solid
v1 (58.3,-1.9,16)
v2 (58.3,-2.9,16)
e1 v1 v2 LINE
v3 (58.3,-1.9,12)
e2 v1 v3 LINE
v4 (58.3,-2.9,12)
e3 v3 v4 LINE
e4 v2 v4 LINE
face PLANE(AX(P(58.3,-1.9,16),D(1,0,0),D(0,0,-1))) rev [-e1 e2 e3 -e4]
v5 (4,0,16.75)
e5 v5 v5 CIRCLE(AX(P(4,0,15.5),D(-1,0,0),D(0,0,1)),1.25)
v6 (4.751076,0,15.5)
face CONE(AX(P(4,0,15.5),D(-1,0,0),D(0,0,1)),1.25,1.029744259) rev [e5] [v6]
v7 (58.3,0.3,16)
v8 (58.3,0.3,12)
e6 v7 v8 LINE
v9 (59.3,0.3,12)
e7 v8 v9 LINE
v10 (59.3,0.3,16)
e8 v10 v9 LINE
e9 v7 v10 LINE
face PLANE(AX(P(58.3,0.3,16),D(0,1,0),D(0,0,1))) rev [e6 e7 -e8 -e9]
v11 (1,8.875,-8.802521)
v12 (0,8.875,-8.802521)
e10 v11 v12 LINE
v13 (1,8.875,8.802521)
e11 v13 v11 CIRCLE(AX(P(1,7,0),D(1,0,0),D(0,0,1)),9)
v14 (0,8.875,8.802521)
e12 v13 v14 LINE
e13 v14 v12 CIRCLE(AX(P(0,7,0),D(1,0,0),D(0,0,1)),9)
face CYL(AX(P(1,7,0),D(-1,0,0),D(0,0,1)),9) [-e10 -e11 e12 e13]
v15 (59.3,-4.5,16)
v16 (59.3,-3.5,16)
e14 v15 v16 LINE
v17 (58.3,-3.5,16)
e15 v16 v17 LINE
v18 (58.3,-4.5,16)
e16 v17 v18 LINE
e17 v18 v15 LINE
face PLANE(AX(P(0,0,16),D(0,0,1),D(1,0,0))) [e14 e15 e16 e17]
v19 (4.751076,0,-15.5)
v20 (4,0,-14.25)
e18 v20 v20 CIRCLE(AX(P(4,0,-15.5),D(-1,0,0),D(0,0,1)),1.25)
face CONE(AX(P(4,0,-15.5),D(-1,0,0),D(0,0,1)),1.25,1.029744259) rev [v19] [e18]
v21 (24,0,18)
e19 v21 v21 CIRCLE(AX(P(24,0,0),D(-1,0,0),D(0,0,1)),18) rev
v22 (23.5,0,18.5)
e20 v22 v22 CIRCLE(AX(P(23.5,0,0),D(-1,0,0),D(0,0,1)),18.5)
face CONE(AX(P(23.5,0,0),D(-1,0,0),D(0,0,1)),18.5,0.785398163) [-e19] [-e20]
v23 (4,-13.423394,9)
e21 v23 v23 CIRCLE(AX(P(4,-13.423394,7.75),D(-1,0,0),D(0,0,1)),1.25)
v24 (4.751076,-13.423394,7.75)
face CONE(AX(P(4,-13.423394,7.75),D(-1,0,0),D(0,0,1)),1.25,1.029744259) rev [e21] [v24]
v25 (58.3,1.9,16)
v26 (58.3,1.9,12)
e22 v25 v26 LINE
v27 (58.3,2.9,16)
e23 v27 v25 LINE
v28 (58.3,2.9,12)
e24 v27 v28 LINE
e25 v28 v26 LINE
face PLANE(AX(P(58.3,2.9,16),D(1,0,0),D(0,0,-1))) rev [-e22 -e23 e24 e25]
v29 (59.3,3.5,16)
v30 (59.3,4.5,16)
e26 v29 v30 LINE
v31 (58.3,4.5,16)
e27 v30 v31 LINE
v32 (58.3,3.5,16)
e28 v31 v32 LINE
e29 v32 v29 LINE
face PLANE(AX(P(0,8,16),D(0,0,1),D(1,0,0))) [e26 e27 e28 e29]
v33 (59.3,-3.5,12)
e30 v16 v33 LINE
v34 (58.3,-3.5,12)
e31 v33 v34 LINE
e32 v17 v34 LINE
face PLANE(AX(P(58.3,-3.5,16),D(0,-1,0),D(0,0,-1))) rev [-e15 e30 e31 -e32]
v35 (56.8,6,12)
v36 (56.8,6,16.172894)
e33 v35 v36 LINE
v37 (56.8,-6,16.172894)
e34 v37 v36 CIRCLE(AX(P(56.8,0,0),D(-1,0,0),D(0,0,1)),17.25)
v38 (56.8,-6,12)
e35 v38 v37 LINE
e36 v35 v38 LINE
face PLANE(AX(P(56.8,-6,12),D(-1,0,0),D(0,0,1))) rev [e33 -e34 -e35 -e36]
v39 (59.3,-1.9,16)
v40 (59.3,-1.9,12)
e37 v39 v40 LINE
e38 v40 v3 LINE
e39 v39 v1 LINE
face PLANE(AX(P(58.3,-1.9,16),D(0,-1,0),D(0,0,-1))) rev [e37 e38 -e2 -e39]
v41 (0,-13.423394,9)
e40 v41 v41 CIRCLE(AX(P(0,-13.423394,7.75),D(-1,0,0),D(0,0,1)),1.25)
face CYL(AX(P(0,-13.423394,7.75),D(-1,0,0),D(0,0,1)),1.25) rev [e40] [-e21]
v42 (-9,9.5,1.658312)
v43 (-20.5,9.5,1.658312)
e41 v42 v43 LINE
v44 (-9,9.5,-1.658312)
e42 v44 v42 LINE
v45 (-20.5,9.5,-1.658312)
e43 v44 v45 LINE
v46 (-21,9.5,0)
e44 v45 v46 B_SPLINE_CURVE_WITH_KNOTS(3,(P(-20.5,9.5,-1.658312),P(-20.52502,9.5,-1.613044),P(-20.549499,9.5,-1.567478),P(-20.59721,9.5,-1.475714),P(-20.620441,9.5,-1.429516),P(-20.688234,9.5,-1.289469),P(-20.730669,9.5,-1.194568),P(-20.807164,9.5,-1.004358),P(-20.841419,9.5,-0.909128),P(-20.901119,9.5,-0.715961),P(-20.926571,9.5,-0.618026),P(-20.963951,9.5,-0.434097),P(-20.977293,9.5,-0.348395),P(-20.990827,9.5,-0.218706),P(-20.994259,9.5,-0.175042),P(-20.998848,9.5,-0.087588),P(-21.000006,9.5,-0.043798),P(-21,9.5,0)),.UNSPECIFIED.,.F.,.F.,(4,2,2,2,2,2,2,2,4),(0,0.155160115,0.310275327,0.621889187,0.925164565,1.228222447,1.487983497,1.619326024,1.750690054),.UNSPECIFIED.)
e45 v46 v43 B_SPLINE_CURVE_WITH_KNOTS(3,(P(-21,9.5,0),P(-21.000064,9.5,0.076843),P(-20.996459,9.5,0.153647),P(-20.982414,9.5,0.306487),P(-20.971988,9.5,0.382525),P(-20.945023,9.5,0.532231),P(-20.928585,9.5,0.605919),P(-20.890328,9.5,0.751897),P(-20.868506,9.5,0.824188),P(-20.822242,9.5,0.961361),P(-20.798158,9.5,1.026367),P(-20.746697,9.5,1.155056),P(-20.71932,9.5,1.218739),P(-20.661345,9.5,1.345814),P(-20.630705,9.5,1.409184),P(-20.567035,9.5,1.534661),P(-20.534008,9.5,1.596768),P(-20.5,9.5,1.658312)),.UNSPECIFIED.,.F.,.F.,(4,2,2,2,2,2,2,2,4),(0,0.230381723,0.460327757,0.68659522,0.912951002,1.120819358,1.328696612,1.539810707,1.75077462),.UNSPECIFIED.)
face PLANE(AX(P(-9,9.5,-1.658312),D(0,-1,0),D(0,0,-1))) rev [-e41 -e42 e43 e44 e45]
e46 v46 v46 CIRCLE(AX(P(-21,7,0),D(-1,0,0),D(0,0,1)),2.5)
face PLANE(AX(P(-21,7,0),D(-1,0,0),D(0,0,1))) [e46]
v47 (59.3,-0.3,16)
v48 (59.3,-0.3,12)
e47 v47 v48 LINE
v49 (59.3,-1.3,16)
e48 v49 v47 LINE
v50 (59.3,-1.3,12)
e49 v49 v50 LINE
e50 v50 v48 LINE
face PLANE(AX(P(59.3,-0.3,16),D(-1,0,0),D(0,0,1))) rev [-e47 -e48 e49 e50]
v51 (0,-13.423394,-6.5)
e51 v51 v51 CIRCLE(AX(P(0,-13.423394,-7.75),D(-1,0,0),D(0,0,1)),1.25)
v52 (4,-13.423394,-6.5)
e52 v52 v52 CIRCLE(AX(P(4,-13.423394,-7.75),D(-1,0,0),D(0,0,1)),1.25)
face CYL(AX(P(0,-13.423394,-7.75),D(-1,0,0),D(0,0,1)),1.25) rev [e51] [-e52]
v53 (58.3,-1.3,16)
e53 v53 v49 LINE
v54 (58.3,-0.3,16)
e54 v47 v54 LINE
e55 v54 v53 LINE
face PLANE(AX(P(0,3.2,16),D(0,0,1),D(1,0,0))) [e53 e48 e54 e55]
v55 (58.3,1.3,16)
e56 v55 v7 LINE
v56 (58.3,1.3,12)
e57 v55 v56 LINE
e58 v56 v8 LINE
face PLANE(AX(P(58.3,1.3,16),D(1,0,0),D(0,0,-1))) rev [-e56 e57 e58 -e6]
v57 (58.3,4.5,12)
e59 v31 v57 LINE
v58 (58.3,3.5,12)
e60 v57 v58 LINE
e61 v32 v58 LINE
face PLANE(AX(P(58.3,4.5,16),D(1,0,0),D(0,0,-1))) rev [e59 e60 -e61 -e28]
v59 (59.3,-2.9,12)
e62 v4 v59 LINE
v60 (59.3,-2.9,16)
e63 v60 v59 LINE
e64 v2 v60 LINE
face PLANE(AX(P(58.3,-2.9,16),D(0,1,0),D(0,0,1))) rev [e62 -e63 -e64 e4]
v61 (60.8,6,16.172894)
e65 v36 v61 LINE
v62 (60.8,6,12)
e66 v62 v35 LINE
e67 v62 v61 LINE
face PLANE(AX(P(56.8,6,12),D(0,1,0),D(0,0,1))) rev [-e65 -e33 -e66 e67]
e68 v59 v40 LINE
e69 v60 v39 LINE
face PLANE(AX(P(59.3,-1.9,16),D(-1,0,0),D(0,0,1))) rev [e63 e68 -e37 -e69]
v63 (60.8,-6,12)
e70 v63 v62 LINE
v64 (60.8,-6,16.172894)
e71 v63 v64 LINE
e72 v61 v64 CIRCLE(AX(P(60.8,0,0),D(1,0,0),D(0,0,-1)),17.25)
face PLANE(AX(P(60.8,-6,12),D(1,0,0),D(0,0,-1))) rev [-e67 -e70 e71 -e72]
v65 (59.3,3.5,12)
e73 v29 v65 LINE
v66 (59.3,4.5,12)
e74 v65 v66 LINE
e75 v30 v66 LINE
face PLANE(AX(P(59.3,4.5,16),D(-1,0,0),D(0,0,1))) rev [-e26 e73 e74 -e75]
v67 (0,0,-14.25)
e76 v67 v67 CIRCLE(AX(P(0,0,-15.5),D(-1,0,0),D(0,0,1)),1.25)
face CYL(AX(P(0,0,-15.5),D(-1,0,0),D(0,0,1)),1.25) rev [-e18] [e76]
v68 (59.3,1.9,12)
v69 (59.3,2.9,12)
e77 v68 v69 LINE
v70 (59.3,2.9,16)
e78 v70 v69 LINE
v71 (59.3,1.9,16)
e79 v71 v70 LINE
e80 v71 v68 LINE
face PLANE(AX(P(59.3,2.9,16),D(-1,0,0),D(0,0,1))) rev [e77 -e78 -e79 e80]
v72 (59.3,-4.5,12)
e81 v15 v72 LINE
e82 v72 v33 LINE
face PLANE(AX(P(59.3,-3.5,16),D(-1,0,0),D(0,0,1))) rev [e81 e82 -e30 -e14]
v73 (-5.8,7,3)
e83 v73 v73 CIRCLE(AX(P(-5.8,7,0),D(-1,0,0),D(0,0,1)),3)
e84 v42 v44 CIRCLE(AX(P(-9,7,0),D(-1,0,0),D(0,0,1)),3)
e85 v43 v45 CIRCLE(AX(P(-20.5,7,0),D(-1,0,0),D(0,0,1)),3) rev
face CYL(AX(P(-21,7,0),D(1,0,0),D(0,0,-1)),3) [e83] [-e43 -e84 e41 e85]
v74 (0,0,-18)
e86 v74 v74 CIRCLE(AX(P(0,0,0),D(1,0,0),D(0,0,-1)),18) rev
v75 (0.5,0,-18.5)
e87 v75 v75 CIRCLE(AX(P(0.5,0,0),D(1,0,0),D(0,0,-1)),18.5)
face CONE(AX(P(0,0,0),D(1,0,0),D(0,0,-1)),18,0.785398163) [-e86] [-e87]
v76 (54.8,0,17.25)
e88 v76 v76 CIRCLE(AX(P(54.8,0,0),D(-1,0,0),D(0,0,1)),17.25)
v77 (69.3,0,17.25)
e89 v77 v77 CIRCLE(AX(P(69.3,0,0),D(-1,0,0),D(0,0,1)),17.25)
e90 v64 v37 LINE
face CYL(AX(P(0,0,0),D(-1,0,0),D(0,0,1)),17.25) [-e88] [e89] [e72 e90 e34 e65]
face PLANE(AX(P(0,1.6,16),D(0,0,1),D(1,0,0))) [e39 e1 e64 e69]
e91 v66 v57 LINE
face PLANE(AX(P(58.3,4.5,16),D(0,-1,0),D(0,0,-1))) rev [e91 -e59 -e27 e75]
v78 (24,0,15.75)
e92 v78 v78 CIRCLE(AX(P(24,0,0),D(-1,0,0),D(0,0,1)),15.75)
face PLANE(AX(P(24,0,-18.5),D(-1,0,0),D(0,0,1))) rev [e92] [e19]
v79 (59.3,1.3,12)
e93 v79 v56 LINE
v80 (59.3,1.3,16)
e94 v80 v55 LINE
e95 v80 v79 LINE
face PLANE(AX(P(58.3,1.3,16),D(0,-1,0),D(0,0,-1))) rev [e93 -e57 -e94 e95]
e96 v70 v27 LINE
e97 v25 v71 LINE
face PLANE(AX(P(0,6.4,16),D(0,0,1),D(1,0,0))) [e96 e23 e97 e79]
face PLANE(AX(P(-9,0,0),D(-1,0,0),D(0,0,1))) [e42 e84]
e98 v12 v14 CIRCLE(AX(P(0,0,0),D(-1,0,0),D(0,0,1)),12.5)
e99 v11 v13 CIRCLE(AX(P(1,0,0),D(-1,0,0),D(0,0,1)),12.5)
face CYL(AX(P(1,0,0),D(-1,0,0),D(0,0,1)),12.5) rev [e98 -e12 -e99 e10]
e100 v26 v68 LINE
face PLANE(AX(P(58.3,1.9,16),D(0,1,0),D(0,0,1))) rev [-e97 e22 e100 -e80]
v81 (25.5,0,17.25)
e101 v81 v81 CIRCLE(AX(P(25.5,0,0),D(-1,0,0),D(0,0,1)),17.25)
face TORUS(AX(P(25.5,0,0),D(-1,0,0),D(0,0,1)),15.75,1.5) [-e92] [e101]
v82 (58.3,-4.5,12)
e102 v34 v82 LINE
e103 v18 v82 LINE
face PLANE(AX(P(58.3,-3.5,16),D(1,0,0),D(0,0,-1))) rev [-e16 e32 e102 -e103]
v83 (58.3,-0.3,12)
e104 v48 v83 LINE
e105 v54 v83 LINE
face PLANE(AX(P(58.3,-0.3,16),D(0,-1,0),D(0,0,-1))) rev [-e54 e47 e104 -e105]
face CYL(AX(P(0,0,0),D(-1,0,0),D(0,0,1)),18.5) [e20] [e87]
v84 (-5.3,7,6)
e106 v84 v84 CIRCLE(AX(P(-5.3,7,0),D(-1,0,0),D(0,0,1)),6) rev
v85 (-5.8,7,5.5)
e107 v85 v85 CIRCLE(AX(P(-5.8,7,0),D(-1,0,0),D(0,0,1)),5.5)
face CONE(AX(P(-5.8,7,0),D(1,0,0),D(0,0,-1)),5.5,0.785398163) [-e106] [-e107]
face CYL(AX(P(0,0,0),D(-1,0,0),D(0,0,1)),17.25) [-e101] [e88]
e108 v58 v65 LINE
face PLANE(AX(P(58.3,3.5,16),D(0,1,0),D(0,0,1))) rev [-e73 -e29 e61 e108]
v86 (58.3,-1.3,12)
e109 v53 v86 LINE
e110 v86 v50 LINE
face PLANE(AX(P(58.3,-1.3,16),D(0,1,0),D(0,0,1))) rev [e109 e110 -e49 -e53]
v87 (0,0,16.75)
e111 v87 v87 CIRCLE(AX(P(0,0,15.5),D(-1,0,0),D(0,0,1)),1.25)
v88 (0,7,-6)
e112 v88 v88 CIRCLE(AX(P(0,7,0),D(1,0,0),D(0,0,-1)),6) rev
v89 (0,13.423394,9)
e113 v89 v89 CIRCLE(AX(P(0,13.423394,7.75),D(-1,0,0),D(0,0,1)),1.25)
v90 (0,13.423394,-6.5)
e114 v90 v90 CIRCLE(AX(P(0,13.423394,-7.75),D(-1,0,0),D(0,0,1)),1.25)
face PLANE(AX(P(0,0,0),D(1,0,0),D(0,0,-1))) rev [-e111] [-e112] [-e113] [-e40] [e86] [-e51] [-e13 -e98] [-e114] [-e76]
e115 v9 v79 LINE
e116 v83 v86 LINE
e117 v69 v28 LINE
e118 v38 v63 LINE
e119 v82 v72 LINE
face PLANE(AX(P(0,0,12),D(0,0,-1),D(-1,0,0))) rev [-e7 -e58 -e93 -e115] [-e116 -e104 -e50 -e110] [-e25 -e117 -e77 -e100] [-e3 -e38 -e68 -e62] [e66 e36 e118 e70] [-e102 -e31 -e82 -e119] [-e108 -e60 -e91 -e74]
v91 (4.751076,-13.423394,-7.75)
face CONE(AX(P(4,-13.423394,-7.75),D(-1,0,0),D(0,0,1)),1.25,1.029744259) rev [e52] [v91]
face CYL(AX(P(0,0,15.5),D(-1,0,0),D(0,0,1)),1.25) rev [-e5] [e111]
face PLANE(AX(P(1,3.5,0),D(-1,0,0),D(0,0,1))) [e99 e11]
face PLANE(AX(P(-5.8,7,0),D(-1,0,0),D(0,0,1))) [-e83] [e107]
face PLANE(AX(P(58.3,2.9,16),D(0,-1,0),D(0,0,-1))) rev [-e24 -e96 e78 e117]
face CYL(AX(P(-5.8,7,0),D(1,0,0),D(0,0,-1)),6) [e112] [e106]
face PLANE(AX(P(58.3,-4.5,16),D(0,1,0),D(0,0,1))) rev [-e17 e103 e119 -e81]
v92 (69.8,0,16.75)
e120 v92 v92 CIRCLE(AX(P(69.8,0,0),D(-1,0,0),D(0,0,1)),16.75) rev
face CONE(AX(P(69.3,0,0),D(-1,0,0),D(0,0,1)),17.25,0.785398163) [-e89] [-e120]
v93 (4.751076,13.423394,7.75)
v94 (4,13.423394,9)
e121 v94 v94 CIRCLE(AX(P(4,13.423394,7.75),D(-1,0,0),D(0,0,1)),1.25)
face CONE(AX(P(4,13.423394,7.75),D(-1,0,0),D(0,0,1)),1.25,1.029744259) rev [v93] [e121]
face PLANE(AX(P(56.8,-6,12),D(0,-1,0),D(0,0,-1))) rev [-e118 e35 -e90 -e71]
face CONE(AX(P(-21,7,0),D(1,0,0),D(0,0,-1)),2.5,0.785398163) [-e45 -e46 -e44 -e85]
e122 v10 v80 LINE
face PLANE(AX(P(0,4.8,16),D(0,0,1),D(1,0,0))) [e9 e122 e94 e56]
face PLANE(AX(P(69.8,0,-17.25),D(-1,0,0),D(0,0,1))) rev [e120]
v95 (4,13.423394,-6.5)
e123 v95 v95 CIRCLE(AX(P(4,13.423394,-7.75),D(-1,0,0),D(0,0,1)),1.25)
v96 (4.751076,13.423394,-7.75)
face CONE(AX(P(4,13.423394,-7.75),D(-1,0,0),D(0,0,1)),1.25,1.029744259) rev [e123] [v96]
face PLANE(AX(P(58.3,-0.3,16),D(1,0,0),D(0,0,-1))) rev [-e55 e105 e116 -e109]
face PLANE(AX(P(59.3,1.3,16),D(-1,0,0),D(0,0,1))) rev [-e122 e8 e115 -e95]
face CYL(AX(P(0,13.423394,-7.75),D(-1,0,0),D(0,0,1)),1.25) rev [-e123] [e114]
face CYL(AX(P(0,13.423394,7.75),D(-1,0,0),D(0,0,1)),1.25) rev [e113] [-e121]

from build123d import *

# Parameters (mm, degrees)
SKETCH3_R                  = 6
BOSS_EXTRUDE1_DEPTH        = 5.8
SKETCH4_R                  = 3
BOSS_EXTRUDE2_DEPTH        = 15.2
SKETCH5_W                  = 3.31662479
SKETCH5_H                  = 2.173071946
CUT_EXTRUDE1_DEPTH         = 12
CHAMFER1_SIZE              = 0.5
CUT_EXTRUDE2_DEPTH         = 1
M3_TAPPED_HOLE1_AT_2_COUNT = 2
M3_TAPPED_HOLE1_AT_2_PITCH = 26.846787517
M3_TAPPED_HOLE1_AT_3_COUNT = 2
M3_TAPPED_HOLE1_AT_3_PITCH = 26.846787517
CIRPATTERN1_COUNT          = 2
SKETCH10_W                 = 4
SKETCH10_H                 = 12
CUT_EXTRUDE3_DEPTH         = 28
SKETCH11_W                 = 1
SKETCH11_H                 = 1
BOSS_EXTRUDE3_DEPTH        = 4
LPATTERN1_COUNT            = 6
LPATTERN1_PITCH            = 1.6


with BuildPart() as part:
    # Sketch1 → Revolve1 (revolve)
    with BuildSketch(Plane(origin=(0, 0, 0), x_dir=(1, 0, 0), z_dir=(0, 1, 0)), mode=Mode.PRIVATE) as revolve1_sk:
        with BuildLine():
            Line((0, 0), (69.8, 0))
            Line((69.8, 0), (69.8, 17.25))
            Line((69.8, 17.25), (25.5, 17.25))
            ThreePointArc((25.5, 17.25), (24.439339828, 16.810660172), (24, 15.75))
            Line((24, 15.75), (24, 18.5))
            Line((24, 18.5), (0, 18.5))
            Line((0, 18.5), (0, 0))
        make_face()
    revolve(revolve1_sk.sketch.rotate(Axis((0, 0, 0), (1, 0, 0)), 180), axis=Axis((0, 0, 0), (1, 0, 0)))

    # Sketch3 → Boss-Extrude1 (add)
    with BuildSketch(Plane.ZY):
        with Locations(Location((0, 7, 0), (0, 0, 180))):
            Circle(SKETCH3_R)
    extrude(amount=BOSS_EXTRUDE1_DEPTH)

    # Sketch4 → Boss-Extrude2 (add)
    with BuildSketch(Plane.ZY.offset(5.8)):
        with Locations(Location((0, 7, 0), (0, 0, 180))):
            Circle(SKETCH4_R)
    extrude(amount=BOSS_EXTRUDE2_DEPTH)

    # Sketch5 → Cut-Extrude1 (cut)
    with BuildSketch(Plane.ZY.offset(21)):
        with Locations((0, 10.586535973)):
            Rectangle(SKETCH5_W, SKETCH5_H)
    extrude(amount=-CUT_EXTRUDE1_DEPTH, mode=Mode.SUBTRACT)

    # Chamfer1
    chamfer1_edges = [part.edges().sort_by_distance(p)[0] for p in [
        (-5.8, 7, 6),
        (-21, 4.356617963, 1.418637165),
        (69.8, 0, -17.25),
        (24, 0, -18.5),
        (0, 0, -18.5),
    ]]
    chamfer(chamfer1_edges, length=CHAMFER1_SIZE - 0.0001)  # a hair under: the kernel refuses the full size

    # Sketch6 → Cut-Extrude2 (cut)
    with BuildSketch(Plane.ZY):
        with BuildLine():
            ThreePointArc((-8.802520946, 8.875), (0, -12.5), (8.802520946, 8.875))
            ThreePointArc((8.802520946, 8.875), (0, -2), (-8.802520946, 8.875))
        make_face()
    extrude(amount=-CUT_EXTRUDE2_DEPTH, mode=Mode.SUBTRACT)

    # Sketch8 → M3 Tapped Hole1 (revolve, cut)
    with BuildSketch(Plane(origin=(0, -13.423393759, -7.75), x_dir=(0, 0, 1), z_dir=(0, 1, 0))):
        Polygon((0, 0), (0, 4.751075774), (1.25, 4), (1.25, 0), align=None)
    m3_tapped_hole1 = revolve(axis=Axis((-6.35, -13.423393759, -7.75), (1, 0, 0)), mode=Mode.SUBTRACT)

    # M3 Tapped Hole1 at 2: M3 Tapped Hole1 ×2
    with Locations(*[(0, i * M3_TAPPED_HOLE1_AT_2_PITCH, 0) for i in range(1, M3_TAPPED_HOLE1_AT_2_COUNT)]):
        add(m3_tapped_hole1, mode=Mode.SUBTRACT)

    # M3 Tapped Hole1 at 3: M3 Tapped Hole1 ×2
    with Locations(*[Vector(0, 0.4999999999999991, 0.8660254037844392) * (i * M3_TAPPED_HOLE1_AT_3_PITCH) for i in range(1, M3_TAPPED_HOLE1_AT_3_COUNT)]):
        add(m3_tapped_hole1, mode=Mode.SUBTRACT)

    # CirPattern1: M3 Tapped Hole1 ×2 about axis
    cirpattern1_axis = Axis((0, 0, 0), (1, 0, 0))
    for i in range(1, CIRPATTERN1_COUNT):
        add(m3_tapped_hole1.rotate(cirpattern1_axis, i * 360 / CIRPATTERN1_COUNT), mode=Mode.SUBTRACT)

    # CirPattern1 copy 1 sketch → CirPattern1 copy 1 (revolve, cut)
    with BuildSketch(Plane(origin=(0, -13.423393759, 7.75), x_dir=(0, 0, -1), z_dir=(0, -1, 0))):
        Polygon((0, 0), (0, 4.751075774), (1.25, 4), (1.25, 0), align=None)
    revolve(axis=Axis((-6.35, -13.423393759, 7.75), (1, 0, 0)), mode=Mode.SUBTRACT)

    # CirPattern1 copy 2 sketch → CirPattern1 copy 2 (revolve, cut)
    with BuildSketch(Plane(origin=(0, 0, -15.5), x_dir=(0, 0, -1), z_dir=(0, -1, 0))):
        Polygon((0, 0), (0, 4.751075774), (1.25, 4), (1.25, 0), align=None)
    revolve(axis=Axis((-6.35, 0, -15.5), (1, 0, 0)), mode=Mode.SUBTRACT)

    # Sketch10 → Cut-Extrude3 (cut)
    with BuildSketch(Plane.XY.offset(40)):
        with Locations((58.8, 0)):
            Rectangle(SKETCH10_W, SKETCH10_H)
    extrude(amount=-CUT_EXTRUDE3_DEPTH, mode=Mode.SUBTRACT)

    # Sketch11 → Boss-Extrude3 (add)
    with BuildSketch(Plane.XY.offset(12)):
        with Locations((58.8, -4)):
            Rectangle(SKETCH11_W, SKETCH11_H)
    boss_extrude3 = extrude(amount=BOSS_EXTRUDE3_DEPTH)

    # LPattern1: Boss-Extrude3 ×6
    with Locations(*[(0, i * LPATTERN1_PITCH, 0) for i in range(1, LPATTERN1_COUNT)]):
        add(boss_extrude3)


solid = part.part
